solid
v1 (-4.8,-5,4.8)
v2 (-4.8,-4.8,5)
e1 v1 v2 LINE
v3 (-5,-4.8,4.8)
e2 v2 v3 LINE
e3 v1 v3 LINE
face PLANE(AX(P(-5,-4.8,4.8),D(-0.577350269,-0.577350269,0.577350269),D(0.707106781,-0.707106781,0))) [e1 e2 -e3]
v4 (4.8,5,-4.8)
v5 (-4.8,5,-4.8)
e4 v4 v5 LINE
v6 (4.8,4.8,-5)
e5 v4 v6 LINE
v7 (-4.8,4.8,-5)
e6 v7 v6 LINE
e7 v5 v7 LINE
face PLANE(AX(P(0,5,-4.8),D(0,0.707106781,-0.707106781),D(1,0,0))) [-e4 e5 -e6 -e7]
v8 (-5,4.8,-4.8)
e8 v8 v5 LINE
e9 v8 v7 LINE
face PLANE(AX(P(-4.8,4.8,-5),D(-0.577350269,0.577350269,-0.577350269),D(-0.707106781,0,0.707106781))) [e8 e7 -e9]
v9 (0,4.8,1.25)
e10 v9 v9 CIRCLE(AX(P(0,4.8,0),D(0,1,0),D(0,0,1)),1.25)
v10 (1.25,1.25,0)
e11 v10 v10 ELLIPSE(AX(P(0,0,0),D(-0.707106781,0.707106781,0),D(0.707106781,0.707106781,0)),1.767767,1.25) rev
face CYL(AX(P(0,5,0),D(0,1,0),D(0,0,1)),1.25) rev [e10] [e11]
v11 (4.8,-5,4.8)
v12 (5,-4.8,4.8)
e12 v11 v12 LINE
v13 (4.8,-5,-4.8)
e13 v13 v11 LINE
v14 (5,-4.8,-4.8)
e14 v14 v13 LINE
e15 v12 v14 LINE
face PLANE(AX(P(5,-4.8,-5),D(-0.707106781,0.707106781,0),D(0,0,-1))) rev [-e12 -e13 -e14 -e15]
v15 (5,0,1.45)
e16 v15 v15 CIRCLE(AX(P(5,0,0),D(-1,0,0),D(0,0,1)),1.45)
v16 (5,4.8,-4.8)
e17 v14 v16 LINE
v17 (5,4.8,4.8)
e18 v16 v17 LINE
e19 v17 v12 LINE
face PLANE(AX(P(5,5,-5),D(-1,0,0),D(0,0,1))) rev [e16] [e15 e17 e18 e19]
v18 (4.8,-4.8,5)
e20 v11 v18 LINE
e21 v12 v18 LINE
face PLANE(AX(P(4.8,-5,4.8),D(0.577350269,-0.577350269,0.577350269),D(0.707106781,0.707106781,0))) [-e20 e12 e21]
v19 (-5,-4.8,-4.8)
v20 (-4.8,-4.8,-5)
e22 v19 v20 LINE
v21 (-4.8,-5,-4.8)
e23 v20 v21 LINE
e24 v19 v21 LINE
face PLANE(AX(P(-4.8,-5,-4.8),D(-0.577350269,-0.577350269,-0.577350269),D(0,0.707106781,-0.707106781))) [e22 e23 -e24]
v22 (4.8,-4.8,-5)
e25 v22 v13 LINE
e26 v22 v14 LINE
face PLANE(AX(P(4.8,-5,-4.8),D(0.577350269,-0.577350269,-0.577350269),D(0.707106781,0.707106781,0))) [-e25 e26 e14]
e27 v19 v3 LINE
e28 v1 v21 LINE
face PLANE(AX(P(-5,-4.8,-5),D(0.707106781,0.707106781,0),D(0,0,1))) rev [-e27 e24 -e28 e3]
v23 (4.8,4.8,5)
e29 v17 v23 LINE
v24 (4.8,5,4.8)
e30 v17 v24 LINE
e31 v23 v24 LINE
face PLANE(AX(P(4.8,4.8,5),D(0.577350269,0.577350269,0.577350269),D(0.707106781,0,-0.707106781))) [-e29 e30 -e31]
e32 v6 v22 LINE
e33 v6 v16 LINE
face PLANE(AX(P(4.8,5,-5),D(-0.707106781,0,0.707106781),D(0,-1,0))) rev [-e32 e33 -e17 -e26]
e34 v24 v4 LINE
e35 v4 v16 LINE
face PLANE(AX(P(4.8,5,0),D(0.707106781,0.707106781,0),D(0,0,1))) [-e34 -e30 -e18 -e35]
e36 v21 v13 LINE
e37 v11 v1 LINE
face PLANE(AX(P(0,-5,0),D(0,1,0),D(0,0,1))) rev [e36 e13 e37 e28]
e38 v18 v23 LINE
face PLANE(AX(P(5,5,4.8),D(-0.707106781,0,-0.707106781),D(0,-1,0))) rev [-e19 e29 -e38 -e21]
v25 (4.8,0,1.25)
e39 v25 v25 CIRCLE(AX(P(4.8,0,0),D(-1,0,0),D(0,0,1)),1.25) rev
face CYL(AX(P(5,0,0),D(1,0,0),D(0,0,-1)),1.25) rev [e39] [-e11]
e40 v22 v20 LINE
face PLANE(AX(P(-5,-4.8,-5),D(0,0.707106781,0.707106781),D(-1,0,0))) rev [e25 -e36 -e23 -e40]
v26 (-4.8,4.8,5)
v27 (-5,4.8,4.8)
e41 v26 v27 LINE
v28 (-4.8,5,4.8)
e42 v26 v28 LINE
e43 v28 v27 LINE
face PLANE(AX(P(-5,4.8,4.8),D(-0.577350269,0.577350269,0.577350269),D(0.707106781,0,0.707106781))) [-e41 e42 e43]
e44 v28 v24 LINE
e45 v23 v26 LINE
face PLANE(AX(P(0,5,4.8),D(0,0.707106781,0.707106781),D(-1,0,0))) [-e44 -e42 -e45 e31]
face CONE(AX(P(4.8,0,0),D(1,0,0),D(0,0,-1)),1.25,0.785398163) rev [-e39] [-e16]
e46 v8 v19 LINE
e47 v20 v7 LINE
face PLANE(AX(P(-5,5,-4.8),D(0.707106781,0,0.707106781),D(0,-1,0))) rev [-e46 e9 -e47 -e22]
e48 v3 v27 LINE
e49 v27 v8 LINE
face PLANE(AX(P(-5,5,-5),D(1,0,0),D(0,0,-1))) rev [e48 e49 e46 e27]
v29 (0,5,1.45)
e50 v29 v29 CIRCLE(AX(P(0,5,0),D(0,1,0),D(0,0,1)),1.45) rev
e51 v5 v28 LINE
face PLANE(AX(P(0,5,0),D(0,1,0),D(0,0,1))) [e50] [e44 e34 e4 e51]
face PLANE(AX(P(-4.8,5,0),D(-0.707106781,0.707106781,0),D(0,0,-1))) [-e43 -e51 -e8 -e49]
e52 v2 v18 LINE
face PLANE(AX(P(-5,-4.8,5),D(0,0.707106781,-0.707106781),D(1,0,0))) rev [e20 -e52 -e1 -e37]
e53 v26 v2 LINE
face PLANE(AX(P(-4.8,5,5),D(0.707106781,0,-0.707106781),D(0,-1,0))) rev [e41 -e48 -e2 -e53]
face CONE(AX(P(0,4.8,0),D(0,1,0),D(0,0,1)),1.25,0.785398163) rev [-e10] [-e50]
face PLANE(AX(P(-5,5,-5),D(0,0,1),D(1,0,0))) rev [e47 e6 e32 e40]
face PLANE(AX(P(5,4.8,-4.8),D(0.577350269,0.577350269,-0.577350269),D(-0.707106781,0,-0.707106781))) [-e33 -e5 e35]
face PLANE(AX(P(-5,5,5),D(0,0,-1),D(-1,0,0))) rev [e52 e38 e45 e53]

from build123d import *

# Parameters (mm, degrees)
SKETCH_1_W                   = 10
SKETCH_1_H                   = 10
EXTRUDE_1_DEPTH              = 5
HOLE_START                   = 1.25
HOLE_WIZARD_M3_2_OUTLINE_R   = 1.25
HOLE_WIZARD_M3_2_DEPTH       = 3.75
HOLE_START_2                 = -1.2500001
HOLE_WIZARD_M3_2_2_OUTLINE_R = 1.25
HOLE_WIZARD_M3_2_2_DEPTH     = 2.5000001
HOLE_WIZARD_M3_2_3_OUTLINE_W = 6
HOLE_WIZARD_M3_2_3_OUTLINE_H = 6
HOLE_WIZARD_M3_2_3_DEPTH     = 3
HOLE_WIZARD_M3_3_REACH       = 14.247
HOLE_WIZARD_M3_3_BORE_R      = 1.25
CHAMFER_1_SIZE               = 0.2


with BuildPart() as part:
    # 草图1 → 凸台-拉伸1 (new, symmetric)
    with BuildSketch(Plane(origin=(0, 0, 0), x_dir=(1, 0, 0), z_dir=(0, 1, 0))):
        Rectangle(SKETCH_1_W, SKETCH_1_H)
    extrude(amount=EXTRUDE_1_DEPTH, both=True)

    # M3 螺纹孔2: read off the stored shape, not the designer's step
    # M3 螺纹孔2 outline → M3 螺纹孔2 (cut)
    with BuildSketch(Plane(origin=(0, 0, 0), x_dir=(1, 0, 0), z_dir=(0, 1, 0)).offset(HOLE_START)):
        Circle(HOLE_WIZARD_M3_2_OUTLINE_R)
    extrude(amount=HOLE_WIZARD_M3_2_DEPTH, mode=Mode.SUBTRACT)

    # Hole Wizard M3 _2 2 outline → Hole Wizard M3 _2 2 (cut)
    with BuildSketch(Plane(origin=(0, 0, 0), x_dir=(1, 0, 0), z_dir=(0, 1, 0)).offset(HOLE_START_2)):
        Circle(HOLE_WIZARD_M3_2_2_OUTLINE_R)
    extrude(amount=HOLE_WIZARD_M3_2_2_DEPTH, mode=Mode.SUBTRACT)

    # Hole Wizard M3 _2 3 outline → Hole Wizard M3 _2 3 (add)
    with BuildSketch(Plane(origin=(0, 0, 0), x_dir=(0.707106781186548, 0.707106781186547, 0), z_dir=(0.707106781186547, -0.707106781186548, 0))):
        Rectangle(HOLE_WIZARD_M3_2_3_OUTLINE_W, HOLE_WIZARD_M3_2_3_OUTLINE_H)
    extrude(amount=HOLE_WIZARD_M3_2_3_DEPTH)

    # M3 螺纹孔3 bore → M3 螺纹孔3 (cut, up to next)
    with BuildSketch(Plane(origin=(5, 0, 0), x_dir=(0, 0, -1), z_dir=(1, 0, 0)), mode=Mode.PRIVATE) as hole_wizard_m3_3_sk1:
        Circle(HOLE_WIZARD_M3_3_BORE_R)
    hole_wizard_m3_3_tool1 = extrude(hole_wizard_m3_3_sk1.sketch, amount=-HOLE_WIZARD_M3_3_REACH, mode=Mode.PRIVATE) & part.part
    add(hole_wizard_m3_3_tool1.solids().sort_by_distance((5, 0, 0))[0], mode=Mode.SUBTRACT)

    # 倒角1
    chamfer_1_edges = [part.edges().sort_by_distance(p)[0] for p in [
        (-5, 5, 0),
        (-1.25, 5, 0),
        (0, 5, 5),
        (5, 0, 1.25),
        (5, 5, 0),
        (0, -5, 5),
        (-5, -5, 0),
        (0, -5, -5),
        (5, -5, 0),
        (5, 0, 5),
        (-5, 0, 5),
        (-5, 0, -5),
        (5, 0, -5),
        (0, 5, -5),
    ]]
    chamfer(chamfer_1_edges, length=CHAMFER_1_SIZE)


solid = part.part
